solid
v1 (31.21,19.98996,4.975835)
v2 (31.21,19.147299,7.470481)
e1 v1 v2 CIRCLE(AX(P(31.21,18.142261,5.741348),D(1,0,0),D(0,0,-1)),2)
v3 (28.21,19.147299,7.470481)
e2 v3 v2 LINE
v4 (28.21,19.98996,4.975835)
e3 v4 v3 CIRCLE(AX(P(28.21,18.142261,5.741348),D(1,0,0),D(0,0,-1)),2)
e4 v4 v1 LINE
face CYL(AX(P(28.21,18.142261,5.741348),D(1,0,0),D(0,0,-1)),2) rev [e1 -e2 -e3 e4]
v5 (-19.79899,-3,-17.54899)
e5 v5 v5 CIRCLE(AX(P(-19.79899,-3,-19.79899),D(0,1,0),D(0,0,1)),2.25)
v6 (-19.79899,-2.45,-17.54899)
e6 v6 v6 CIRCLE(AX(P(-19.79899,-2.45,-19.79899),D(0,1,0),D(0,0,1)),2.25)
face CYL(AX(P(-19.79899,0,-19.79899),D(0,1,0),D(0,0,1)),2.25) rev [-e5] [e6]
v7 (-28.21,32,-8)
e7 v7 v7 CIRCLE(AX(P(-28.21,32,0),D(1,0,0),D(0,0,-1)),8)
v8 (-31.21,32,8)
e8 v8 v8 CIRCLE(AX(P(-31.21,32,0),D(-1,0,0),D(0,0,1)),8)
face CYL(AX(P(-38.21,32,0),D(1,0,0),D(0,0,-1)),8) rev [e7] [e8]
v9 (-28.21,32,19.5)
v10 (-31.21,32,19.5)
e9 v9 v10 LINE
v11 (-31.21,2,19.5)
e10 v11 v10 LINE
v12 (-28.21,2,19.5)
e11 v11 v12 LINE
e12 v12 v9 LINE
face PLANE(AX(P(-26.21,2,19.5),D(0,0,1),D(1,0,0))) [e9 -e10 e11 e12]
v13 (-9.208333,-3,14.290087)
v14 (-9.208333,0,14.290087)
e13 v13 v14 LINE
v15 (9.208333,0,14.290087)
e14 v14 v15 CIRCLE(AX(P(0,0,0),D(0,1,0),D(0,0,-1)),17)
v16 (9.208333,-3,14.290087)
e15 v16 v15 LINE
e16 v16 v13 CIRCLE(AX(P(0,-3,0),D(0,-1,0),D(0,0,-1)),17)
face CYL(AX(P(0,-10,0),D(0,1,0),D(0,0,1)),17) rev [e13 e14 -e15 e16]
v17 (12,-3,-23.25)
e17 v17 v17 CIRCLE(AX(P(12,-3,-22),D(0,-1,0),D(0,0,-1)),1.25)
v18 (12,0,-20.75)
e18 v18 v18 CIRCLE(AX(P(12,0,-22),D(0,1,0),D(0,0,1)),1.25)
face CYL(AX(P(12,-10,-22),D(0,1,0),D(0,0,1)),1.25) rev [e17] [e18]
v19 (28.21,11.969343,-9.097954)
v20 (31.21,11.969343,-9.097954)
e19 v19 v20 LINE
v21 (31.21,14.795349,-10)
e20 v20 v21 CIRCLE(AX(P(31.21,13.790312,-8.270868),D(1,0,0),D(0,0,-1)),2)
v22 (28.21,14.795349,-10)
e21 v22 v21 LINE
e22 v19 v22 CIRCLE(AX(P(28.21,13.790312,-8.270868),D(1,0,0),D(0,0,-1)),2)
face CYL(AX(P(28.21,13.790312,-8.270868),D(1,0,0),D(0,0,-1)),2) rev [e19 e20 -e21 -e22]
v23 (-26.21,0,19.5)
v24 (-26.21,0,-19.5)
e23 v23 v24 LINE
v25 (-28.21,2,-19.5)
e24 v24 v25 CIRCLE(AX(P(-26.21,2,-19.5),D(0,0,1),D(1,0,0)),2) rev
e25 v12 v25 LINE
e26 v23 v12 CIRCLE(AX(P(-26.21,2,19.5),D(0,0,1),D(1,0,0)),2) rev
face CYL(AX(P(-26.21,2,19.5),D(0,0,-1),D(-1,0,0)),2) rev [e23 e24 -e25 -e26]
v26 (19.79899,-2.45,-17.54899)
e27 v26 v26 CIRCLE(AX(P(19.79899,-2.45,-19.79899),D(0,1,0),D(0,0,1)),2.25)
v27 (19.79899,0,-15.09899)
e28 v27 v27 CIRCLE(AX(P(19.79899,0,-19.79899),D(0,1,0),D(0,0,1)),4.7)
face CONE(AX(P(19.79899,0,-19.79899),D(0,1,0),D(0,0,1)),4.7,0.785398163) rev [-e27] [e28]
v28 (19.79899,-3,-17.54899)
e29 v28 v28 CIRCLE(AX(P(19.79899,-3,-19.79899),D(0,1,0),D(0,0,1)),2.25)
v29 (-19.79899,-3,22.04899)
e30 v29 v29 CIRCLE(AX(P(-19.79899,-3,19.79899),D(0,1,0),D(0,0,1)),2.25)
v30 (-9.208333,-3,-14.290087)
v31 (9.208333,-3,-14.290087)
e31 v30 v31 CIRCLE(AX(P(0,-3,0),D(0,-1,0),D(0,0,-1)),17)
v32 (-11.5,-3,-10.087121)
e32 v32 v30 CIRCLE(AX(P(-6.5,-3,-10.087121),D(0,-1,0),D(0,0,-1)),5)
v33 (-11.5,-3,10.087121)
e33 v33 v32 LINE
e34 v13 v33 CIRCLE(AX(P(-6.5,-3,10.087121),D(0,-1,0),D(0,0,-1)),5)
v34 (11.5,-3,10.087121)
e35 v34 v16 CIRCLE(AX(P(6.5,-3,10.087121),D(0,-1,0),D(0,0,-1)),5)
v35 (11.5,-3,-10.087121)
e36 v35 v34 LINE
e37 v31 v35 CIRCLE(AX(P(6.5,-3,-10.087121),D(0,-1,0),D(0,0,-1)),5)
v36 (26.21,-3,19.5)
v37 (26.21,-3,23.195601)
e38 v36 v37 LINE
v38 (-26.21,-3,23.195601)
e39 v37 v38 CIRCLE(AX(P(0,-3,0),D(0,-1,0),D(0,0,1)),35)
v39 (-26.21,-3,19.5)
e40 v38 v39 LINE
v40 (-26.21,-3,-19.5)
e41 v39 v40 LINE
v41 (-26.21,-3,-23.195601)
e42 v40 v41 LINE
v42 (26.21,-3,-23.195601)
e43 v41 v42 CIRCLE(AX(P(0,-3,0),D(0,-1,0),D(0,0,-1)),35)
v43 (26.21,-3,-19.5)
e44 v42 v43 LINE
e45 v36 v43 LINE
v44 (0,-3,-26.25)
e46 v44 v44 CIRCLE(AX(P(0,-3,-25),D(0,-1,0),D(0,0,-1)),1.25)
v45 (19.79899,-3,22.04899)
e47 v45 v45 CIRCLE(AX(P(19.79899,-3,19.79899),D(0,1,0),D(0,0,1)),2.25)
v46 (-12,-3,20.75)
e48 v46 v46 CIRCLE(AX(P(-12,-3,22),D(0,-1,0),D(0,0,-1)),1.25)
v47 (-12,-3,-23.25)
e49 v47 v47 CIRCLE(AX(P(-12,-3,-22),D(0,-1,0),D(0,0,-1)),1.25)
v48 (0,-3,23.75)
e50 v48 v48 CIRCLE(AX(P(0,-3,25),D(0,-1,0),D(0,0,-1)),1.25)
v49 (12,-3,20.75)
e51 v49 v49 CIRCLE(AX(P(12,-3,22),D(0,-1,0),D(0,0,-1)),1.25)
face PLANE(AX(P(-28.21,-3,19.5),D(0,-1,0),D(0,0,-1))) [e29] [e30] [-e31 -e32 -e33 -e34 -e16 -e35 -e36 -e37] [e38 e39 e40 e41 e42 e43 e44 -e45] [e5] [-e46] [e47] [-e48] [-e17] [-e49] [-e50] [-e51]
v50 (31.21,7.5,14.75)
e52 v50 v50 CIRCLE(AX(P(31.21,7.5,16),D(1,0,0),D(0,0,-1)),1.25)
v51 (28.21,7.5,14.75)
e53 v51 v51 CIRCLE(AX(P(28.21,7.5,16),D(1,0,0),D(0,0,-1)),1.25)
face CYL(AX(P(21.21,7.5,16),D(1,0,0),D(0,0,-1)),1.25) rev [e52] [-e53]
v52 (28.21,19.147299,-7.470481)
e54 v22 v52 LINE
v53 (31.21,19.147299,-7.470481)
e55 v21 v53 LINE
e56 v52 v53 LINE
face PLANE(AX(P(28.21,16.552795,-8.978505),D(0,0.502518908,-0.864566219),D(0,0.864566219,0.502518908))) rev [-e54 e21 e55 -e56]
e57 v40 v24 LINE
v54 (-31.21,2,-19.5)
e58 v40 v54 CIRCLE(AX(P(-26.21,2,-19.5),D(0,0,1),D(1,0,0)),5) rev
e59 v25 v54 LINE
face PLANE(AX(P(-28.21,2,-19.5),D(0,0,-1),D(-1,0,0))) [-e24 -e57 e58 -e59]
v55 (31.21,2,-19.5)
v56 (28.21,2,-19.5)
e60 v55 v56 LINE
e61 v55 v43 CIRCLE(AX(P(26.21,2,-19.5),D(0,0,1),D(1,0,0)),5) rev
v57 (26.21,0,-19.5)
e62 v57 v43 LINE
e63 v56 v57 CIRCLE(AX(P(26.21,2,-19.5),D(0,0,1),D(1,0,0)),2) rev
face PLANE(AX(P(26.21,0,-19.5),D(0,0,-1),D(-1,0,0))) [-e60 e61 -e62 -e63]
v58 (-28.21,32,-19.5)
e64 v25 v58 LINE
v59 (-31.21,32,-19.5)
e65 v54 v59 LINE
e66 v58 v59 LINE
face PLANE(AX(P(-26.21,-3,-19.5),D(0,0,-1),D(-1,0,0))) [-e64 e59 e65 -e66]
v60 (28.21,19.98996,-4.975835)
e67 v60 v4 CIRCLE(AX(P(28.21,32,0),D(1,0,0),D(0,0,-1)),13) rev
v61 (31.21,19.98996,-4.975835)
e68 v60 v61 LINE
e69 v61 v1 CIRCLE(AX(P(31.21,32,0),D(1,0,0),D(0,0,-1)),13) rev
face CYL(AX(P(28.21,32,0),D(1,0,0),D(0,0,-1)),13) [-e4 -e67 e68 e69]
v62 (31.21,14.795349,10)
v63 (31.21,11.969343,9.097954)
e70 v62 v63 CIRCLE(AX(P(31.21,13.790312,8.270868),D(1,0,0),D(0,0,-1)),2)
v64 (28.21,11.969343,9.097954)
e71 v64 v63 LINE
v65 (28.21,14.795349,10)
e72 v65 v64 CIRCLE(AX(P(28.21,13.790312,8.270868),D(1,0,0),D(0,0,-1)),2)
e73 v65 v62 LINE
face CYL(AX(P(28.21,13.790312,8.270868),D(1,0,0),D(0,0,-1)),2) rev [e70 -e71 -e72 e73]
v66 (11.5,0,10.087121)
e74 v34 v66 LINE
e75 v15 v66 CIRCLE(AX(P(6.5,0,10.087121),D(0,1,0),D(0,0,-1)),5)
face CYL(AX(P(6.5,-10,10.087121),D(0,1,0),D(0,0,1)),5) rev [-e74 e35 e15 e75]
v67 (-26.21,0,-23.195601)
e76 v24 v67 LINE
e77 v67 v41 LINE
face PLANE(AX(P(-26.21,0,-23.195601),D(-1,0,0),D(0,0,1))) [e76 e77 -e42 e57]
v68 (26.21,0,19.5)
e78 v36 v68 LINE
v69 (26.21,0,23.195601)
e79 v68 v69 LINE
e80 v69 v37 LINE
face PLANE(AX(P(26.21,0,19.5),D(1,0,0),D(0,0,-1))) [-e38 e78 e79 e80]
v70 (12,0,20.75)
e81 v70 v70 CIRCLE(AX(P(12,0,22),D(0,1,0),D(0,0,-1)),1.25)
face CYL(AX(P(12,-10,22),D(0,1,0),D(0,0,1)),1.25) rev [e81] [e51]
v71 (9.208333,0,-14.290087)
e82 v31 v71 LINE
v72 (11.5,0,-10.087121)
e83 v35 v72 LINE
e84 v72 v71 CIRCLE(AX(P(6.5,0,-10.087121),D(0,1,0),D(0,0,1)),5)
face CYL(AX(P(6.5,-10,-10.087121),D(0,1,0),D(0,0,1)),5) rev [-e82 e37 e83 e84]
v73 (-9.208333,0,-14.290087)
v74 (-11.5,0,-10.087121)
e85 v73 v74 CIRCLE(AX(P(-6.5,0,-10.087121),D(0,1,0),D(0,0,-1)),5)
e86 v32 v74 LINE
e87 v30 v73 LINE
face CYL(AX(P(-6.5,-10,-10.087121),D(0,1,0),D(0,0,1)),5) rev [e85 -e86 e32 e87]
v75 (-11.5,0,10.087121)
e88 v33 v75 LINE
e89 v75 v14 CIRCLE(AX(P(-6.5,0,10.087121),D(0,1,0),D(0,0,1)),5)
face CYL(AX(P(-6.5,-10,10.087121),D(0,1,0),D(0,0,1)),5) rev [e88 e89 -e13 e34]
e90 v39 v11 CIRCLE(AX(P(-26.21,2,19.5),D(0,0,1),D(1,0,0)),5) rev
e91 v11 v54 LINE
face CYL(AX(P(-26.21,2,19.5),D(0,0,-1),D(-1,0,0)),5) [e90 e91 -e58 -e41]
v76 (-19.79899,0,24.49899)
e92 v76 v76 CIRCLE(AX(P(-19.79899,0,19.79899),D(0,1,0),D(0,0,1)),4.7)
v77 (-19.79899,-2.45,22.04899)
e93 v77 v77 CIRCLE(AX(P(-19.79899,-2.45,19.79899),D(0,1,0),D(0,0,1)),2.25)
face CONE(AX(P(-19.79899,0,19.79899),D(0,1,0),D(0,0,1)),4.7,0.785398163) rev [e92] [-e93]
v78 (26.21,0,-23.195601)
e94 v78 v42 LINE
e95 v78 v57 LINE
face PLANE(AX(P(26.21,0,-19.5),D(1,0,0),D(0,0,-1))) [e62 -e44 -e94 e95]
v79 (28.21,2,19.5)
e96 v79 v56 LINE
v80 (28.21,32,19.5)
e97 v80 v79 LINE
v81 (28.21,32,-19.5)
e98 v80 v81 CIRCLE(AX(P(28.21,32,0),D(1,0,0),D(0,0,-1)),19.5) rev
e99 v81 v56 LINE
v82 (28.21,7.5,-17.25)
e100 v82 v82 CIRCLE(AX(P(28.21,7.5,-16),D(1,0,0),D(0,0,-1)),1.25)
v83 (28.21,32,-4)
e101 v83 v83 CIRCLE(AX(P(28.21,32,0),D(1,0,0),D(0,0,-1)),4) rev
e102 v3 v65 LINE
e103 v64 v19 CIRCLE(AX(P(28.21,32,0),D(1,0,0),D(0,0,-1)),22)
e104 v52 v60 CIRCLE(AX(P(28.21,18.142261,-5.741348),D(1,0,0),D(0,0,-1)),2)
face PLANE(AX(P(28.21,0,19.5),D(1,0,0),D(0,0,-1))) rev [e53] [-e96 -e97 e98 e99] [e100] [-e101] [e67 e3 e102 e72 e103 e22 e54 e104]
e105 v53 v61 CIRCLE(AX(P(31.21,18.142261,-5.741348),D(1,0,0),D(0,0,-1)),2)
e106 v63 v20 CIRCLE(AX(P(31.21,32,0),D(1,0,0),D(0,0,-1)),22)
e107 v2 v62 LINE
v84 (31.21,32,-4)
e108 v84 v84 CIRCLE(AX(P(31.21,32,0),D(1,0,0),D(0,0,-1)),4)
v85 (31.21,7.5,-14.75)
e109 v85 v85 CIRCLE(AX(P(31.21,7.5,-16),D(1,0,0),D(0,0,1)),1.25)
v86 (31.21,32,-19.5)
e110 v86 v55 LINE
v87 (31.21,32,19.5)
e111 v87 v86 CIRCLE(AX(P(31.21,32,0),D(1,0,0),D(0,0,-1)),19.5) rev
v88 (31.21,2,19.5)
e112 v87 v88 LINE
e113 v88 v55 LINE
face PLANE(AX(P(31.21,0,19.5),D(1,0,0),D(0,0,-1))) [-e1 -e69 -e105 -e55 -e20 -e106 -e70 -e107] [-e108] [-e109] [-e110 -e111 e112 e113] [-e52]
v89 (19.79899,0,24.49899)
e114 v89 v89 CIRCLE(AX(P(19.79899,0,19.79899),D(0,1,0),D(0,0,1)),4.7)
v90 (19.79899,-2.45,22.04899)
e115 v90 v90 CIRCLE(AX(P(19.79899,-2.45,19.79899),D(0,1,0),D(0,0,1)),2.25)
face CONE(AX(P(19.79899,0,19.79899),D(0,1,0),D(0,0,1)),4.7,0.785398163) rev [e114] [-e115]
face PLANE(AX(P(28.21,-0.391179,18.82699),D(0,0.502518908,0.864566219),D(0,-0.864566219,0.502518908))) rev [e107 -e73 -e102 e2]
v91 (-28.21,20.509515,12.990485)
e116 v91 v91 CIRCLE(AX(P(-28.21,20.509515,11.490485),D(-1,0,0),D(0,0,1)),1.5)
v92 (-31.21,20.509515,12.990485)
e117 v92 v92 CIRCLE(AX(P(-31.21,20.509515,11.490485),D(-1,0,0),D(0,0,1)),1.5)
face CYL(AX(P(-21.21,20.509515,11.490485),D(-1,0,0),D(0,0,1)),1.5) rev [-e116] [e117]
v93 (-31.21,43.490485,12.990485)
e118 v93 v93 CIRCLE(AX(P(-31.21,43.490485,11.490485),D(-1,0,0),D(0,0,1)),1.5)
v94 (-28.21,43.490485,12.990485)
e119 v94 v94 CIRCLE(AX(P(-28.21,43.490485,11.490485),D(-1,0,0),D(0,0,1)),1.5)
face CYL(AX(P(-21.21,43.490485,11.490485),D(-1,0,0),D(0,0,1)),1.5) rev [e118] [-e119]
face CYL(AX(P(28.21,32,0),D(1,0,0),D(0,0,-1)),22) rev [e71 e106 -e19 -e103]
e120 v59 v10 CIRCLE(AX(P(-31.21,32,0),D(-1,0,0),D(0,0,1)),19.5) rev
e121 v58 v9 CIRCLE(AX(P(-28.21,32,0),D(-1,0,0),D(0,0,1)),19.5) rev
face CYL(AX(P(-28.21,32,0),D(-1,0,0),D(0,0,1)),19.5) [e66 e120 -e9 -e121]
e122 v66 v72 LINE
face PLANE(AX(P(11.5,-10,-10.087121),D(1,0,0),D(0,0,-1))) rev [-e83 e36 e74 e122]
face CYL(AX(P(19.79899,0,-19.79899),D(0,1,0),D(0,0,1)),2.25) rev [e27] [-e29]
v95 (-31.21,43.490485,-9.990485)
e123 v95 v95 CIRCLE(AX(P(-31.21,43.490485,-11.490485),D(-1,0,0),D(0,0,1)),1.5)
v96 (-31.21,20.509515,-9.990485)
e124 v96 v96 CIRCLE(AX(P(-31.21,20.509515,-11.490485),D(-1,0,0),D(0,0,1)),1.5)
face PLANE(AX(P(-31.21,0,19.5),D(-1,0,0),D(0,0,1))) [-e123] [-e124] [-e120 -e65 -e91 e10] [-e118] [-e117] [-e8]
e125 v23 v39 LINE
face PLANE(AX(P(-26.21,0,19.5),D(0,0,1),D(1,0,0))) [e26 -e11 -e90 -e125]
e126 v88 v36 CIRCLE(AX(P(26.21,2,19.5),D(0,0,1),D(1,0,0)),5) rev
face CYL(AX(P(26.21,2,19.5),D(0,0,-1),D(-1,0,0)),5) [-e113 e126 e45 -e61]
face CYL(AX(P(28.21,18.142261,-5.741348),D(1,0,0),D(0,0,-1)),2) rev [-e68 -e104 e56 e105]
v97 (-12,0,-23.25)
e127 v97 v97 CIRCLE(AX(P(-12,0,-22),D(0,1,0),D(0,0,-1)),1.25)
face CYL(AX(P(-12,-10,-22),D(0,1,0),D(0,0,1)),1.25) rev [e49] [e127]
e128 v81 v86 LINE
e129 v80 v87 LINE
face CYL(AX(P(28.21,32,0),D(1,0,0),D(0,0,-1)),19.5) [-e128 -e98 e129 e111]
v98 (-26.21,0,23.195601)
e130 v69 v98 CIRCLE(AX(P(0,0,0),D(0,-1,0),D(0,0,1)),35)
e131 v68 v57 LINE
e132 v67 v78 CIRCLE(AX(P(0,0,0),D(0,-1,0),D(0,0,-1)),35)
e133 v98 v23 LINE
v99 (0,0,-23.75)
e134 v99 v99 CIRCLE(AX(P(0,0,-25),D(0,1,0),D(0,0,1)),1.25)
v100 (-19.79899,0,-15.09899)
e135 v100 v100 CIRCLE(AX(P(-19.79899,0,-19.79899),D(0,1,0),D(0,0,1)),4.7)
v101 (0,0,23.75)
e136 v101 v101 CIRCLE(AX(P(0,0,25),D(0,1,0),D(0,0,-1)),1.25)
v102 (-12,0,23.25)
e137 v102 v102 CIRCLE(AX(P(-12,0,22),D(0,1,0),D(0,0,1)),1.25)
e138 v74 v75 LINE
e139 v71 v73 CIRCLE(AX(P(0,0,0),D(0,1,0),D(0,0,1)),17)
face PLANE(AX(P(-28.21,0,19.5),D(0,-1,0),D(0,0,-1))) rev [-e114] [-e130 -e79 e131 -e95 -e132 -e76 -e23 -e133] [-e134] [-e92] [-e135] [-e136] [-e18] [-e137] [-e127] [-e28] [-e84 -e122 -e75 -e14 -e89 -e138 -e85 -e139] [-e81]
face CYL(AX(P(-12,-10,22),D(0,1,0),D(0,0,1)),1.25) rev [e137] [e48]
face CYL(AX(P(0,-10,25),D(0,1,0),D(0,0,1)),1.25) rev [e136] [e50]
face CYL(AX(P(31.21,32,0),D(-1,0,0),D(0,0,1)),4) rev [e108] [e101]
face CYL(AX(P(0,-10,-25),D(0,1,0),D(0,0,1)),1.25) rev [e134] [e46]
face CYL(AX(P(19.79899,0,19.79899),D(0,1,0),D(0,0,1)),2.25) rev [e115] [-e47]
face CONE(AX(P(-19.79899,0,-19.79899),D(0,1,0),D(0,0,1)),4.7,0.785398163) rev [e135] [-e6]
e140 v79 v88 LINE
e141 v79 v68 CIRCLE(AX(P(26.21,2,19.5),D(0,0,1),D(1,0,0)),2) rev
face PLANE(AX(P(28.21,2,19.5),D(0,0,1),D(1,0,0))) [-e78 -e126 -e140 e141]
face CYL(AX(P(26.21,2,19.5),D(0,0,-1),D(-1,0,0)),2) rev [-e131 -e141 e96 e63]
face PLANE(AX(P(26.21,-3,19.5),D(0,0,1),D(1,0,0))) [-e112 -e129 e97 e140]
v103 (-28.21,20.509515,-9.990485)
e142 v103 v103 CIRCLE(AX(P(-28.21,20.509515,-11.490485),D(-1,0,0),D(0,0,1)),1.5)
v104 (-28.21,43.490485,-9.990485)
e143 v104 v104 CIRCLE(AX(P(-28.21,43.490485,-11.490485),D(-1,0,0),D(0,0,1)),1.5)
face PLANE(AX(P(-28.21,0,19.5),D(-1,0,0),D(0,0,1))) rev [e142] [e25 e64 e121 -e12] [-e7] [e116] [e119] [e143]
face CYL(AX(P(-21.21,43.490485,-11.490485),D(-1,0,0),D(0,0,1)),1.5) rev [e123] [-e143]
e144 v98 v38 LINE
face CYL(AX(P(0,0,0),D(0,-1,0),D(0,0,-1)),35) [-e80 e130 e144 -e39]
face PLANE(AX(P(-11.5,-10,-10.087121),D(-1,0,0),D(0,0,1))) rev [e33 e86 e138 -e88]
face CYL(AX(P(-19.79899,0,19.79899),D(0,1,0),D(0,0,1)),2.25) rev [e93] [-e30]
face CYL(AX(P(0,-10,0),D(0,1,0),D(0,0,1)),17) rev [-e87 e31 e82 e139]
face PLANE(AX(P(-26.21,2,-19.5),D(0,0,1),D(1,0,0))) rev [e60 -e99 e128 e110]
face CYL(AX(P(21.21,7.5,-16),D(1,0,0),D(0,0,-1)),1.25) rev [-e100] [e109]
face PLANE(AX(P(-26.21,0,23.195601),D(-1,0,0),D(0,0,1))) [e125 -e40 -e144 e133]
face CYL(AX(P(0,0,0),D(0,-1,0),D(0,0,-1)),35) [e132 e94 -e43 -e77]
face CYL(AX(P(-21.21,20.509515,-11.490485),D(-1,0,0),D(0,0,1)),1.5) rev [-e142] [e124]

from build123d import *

# Parameters (mm, degrees)
BASE_FLANGE1_DEPTH                           = 19.5
SKETCH13_R                                   = 4
CUT_EXTRUDE6_DEPTH                           = 84.228219974
CUT_EXTRUDE7_DEPTH                           = 84.228219974
CUT_EXTRUDE7_DEPTH_BACK                      = 84.228219974
SKETCH33_R                                   = 8
CUT_EXTRUDE10_DEPTH                          = 10
SKETCH34_R                                   = 1.5
CUT_EXTRUDE11_DEPTH                          = 10
BOSS_EXTRUDE1_DEPTH                          = 3
TAB1_START                                   = -3
TAB1_DEPTH                                   = 3
CSK_FOR_M4_COUNTERSUNK_FLAT_HEAD_SCR_2_COUNT = 2
CSK_FOR_M4_COUNTERSUNK_FLAT_HEAD_SCR_2_PITCH = 39.597979746
CSK_FOR_M4_COUNTERSUNK_FLAT_HEAD_SCR_3_COUNT = 2
CSK_FOR_M4_COUNTERSUNK_FLAT_HEAD_SCR_3_PITCH = 56
CSK_FOR_M4_COUNTERSUNK_FLAT_HEAD_SCR_4_COUNT = 2
CSK_FOR_M4_COUNTERSUNK_FLAT_HEAD_SCR_4_PITCH = 39.597979746
SKETCH44_R                                   = 1.25
CUT_EXTRUDE13_DEPTH                          = 10
SKETCH45_R                                   = 1.25
CUT_EXTRUDE14_DEPTH                          = 10


# Read off the part's stored shape, not the designer's step: Tab1
# Sheet-metal steps are written as plain solids
with BuildPart() as part:
    # Sketch1 → Base-Flange1 (new, symmetric)
    with BuildSketch(Plane.XY):
        with BuildLine():
            Line((-28.21, 74.65), (-28.21, 2))
            ThreePointArc((-28.21, 2), (-27.624213562, 0.585786438), (-26.21, 0))
            Line((-26.21, 0), (26.21, 0))
            ThreePointArc((26.21, 0), (27.624213562, 0.585786438), (28.21, 2))
            Line((28.21, 2), (28.21, 74.65))
            Line((28.21, 74.65), (31.21, 74.65))
            Line((31.21, 74.65), (31.21, 2))
            ThreePointArc((31.21, 2), (29.745533906, -1.535533906), (26.21, -3))
            Line((26.21, -3), (-26.21, -3))
            ThreePointArc((-26.21, -3), (-29.745533906, -1.535533906), (-31.21, 2))
            Line((-31.21, 2), (-31.21, 74.65))
            Line((-31.21, 74.65), (-28.21, 74.65))
        make_face()
    extrude(amount=BASE_FLANGE1_DEPTH, both=True)

    # Sketch13 → Cut-Extrude6 (cut, through all)
    with BuildSketch(Plane(origin=(0, 0, 0), x_dir=(0, 0, -1), z_dir=(1, 0, 0))):
        with Locations((0, 32)):
            Circle(SKETCH13_R)
    extrude(amount=CUT_EXTRUDE6_DEPTH, mode=Mode.SUBTRACT)

    # Sketch15 → Cut-Extrude7 (cut, two sides: drawn at the far end of the back side and taken through both)
    with BuildSketch(Plane(origin=(0, 0, 0), x_dir=(0, 0, -1), z_dir=(1, 0, 0)).offset(-CUT_EXTRUDE7_DEPTH_BACK)):
        with BuildLine():
            Line((-19.5, 32), (-26.744382408, 32))
            Line((-26.744382408, 32), (-26.744382408, 87.632847334))
            Line((-26.744382408, 87.632847334), (26.744382408, 87.632847334))
            Line((26.744382408, 87.632847334), (26.744382408, 32))
            Line((26.744382408, 32), (19.5, 32))
            ThreePointArc((19.5, 32), (0, 51.5), (-19.5, 32))
        make_face()
        with BuildLine():
            Line((7.470480628, 19.147299148), (10, 14.795349466))
            ThreePointArc((10, 14.795349466), (10.176160856, 13.182152576), (9.097954318, 11.969342816))
            ThreePointArc((9.097954318, 11.969342816), (0, 10), (-9.097954318, 11.969342816))
            ThreePointArc((-9.097954318, 11.969342816), (-10.176160856, 13.182152576), (-10, 14.795349466))
            Line((-10, 14.795349466), (-7.470480628, 19.147299148))
            ThreePointArc((-7.470480628, 19.147299148), (-6.381394917, 20.037080634), (-4.975835097, 19.989959822))
            ThreePointArc((-4.975835097, 19.989959822), (0, 19), (4.975835097, 19.989959822))
            ThreePointArc((4.975835097, 19.989959822), (6.381394917, 20.037080634), (7.470480628, 19.147299148))
        make_face()
    extrude(amount=CUT_EXTRUDE7_DEPTH + CUT_EXTRUDE7_DEPTH_BACK, mode=Mode.SUBTRACT)

    # Sketch33 → Cut-Extrude10 (cut)
    with BuildSketch(Plane(origin=(-28.21, 0, 0), x_dir=(0, 0, -1), z_dir=(1, 0, 0))):
        with Locations((0, 32)):
            Circle(SKETCH33_R)
    extrude(amount=-CUT_EXTRUDE10_DEPTH, mode=Mode.SUBTRACT)

    # Sketch34 → Cut-Extrude11 (cut)
    with BuildSketch(Plane.ZY.offset(31.21)):
        with Locations((-11.490485194, 43.490485194)):
            Circle(SKETCH34_R)
        with Locations((11.490485194, 43.490485194)):
            Circle(SKETCH34_R)
        with Locations((11.490485194, 20.509514806)):
            Circle(SKETCH34_R)
        with Locations((-11.490485194, 20.509514806)):
            Circle(SKETCH34_R)
    extrude(amount=-CUT_EXTRUDE11_DEPTH, mode=Mode.SUBTRACT)

    # Sketch37 → Boss-Extrude1 (add)
    with BuildSketch(Plane.ZY.offset(31.21)):
        with BuildLine():
            Line((7.470480628, 19.147299148), (10, 14.795349466))
            ThreePointArc((10, 14.795349466), (10.176160856, 13.182152576), (9.097954318, 11.969342816))
            ThreePointArc((9.097954318, 11.969342816), (0, 10), (-9.097954318, 11.969342816))
            ThreePointArc((-9.097954318, 11.969342816), (-10.176160856, 13.182152576), (-10, 14.795349466))
            Line((-10, 14.795349466), (-7.470480628, 19.147299148))
            ThreePointArc((-7.470480628, 19.147299148), (-6.381394917, 20.037080634), (-4.975835097, 19.989959822))
            ThreePointArc((-4.975835097, 19.989959822), (0, 19), (4.975835097, 19.989959822))
            ThreePointArc((4.975835097, 19.989959822), (6.381394917, 20.037080634), (7.470480628, 19.147299148))
        make_face()
    extrude(amount=-BOSS_EXTRUDE1_DEPTH)

    # Tab1 outline → Tab1 (add)
    with BuildSketch(Plane.XZ.offset(3).offset(TAB1_START)):
        with BuildLine():
            Line((26.21, 19.5), (26.21, 23.195600876))
            ThreePointArc((26.21, 23.195600876), (0, 35), (-26.21, 23.195600876))
            Line((-26.21, 23.195600876), (-26.21, 19.5))
            Line((-26.21, 19.5), (26.21, 19.5))
        make_face()
        with BuildLine():
            Line((-26.21, -19.5), (-26.21, -23.195600876))
            ThreePointArc((-26.21, -23.195600876), (0, -35), (26.21, -23.195600876))
            Line((26.21, -23.195600876), (26.21, -19.5))
            Line((26.21, -19.5), (-26.21, -19.5))
        make_face()
    extrude(amount=TAB1_DEPTH)

    # Sketch42 → CSK for M4 Countersunk Flat Head Screw1 (revolve, cut)
    with BuildSketch(Plane(origin=(19.798989873, 0, -19.798989873), x_dir=(0, 0, 1), z_dir=(1, 0, 0))):
        Polygon((0, 0), (0, 3), (2.25, 3), (2.25, 2.45), (4.7, 0), align=None)
    csk_for_m4_countersunk_flat_head_screw1 = revolve(axis=Axis((19.798989873, 6.35, -19.798989873), (0, -1, 0)), mode=Mode.SUBTRACT)

    # CSK for M4 Countersunk Flat Head Scr 2: CSK for M4 Countersunk Flat Head Screw1 ×2
    with Locations(*[(-i * CSK_FOR_M4_COUNTERSUNK_FLAT_HEAD_SCR_2_PITCH, 0, 0) for i in range(1, CSK_FOR_M4_COUNTERSUNK_FLAT_HEAD_SCR_2_COUNT)]):
        add(csk_for_m4_countersunk_flat_head_screw1, mode=Mode.SUBTRACT)

    # CSK for M4 Countersunk Flat Head Scr 3: CSK for M4 Countersunk Flat Head Screw1 ×2
    with Locations(*[Vector(-0.7071067811865476, 0, 0.7071067811865476) * (i * CSK_FOR_M4_COUNTERSUNK_FLAT_HEAD_SCR_3_PITCH) for i in range(1, CSK_FOR_M4_COUNTERSUNK_FLAT_HEAD_SCR_3_COUNT)]):
        add(csk_for_m4_countersunk_flat_head_screw1, mode=Mode.SUBTRACT)

    # CSK for M4 Countersunk Flat Head Scr 4: CSK for M4 Countersunk Flat Head Screw1 ×2
    with Locations(*[(0, 0, i * CSK_FOR_M4_COUNTERSUNK_FLAT_HEAD_SCR_4_PITCH) for i in range(1, CSK_FOR_M4_COUNTERSUNK_FLAT_HEAD_SCR_4_COUNT)]):
        add(csk_for_m4_countersunk_flat_head_screw1, mode=Mode.SUBTRACT)

    # Sketch44 → Cut-Extrude13 (cut)
    with BuildSketch(Plane(origin=(0, 0, 0), x_dir=(1, 0, 0), z_dir=(0, 1, 0))):
        with Locations(Location((0, 25, 0), (0, 0, 270))):
            Circle(SKETCH44_R)
        with Locations(Location((12, 22, 0), (0, 0, 270))):
            Circle(SKETCH44_R)
        with Locations(Location((-12, 22, 0), (0, 0, 90))):
            Circle(SKETCH44_R)
        with Locations(Location((12, -22, 0), (0, 0, 90))):
            Circle(SKETCH44_R)
        with Locations(Location((0, -25, 0), (0, 0, 90))):
            Circle(SKETCH44_R)
        with Locations(Location((-12, -22, 0), (0, 0, 270))):
            Circle(SKETCH44_R)
        with BuildLine():
            Line((-11.5, 10.087120501), (-11.5, -10.087120501))
            ThreePointArc((-11.5, -10.087120501), (-10.88985573, -12.48068827), (-9.208333333, -14.290087376))
            ThreePointArc((-9.208333333, -14.290087376), (0, -17), (9.208333333, -14.290087376))
            ThreePointArc((9.208333333, -14.290087376), (10.88985573, -12.48068827), (11.5, -10.087120501))
            Line((11.5, -10.087120501), (11.5, 10.087120501))
            ThreePointArc((11.5, 10.087120501), (10.88985573, 12.48068827), (9.208333333, 14.290087376))
            ThreePointArc((9.208333333, 14.290087376), (0, 17), (-9.208333333, 14.290087376))
            ThreePointArc((-9.208333333, 14.290087376), (-10.88985573, 12.48068827), (-11.5, 10.087120501))
        make_face()
    extrude(amount=-CUT_EXTRUDE13_DEPTH, mode=Mode.SUBTRACT)

    # Sketch45 → Cut-Extrude14 (cut)
    with BuildSketch(Plane(origin=(31.21, 0, 0), x_dir=(0, 0, -1), z_dir=(1, 0, 0))):
        with Locations((-16, 7.5)):
            Circle(SKETCH45_R)
        with Locations((16, 7.5)):
            Circle(SKETCH45_R)
    extrude(amount=-CUT_EXTRUDE14_DEPTH, mode=Mode.SUBTRACT)


solid = part.part
